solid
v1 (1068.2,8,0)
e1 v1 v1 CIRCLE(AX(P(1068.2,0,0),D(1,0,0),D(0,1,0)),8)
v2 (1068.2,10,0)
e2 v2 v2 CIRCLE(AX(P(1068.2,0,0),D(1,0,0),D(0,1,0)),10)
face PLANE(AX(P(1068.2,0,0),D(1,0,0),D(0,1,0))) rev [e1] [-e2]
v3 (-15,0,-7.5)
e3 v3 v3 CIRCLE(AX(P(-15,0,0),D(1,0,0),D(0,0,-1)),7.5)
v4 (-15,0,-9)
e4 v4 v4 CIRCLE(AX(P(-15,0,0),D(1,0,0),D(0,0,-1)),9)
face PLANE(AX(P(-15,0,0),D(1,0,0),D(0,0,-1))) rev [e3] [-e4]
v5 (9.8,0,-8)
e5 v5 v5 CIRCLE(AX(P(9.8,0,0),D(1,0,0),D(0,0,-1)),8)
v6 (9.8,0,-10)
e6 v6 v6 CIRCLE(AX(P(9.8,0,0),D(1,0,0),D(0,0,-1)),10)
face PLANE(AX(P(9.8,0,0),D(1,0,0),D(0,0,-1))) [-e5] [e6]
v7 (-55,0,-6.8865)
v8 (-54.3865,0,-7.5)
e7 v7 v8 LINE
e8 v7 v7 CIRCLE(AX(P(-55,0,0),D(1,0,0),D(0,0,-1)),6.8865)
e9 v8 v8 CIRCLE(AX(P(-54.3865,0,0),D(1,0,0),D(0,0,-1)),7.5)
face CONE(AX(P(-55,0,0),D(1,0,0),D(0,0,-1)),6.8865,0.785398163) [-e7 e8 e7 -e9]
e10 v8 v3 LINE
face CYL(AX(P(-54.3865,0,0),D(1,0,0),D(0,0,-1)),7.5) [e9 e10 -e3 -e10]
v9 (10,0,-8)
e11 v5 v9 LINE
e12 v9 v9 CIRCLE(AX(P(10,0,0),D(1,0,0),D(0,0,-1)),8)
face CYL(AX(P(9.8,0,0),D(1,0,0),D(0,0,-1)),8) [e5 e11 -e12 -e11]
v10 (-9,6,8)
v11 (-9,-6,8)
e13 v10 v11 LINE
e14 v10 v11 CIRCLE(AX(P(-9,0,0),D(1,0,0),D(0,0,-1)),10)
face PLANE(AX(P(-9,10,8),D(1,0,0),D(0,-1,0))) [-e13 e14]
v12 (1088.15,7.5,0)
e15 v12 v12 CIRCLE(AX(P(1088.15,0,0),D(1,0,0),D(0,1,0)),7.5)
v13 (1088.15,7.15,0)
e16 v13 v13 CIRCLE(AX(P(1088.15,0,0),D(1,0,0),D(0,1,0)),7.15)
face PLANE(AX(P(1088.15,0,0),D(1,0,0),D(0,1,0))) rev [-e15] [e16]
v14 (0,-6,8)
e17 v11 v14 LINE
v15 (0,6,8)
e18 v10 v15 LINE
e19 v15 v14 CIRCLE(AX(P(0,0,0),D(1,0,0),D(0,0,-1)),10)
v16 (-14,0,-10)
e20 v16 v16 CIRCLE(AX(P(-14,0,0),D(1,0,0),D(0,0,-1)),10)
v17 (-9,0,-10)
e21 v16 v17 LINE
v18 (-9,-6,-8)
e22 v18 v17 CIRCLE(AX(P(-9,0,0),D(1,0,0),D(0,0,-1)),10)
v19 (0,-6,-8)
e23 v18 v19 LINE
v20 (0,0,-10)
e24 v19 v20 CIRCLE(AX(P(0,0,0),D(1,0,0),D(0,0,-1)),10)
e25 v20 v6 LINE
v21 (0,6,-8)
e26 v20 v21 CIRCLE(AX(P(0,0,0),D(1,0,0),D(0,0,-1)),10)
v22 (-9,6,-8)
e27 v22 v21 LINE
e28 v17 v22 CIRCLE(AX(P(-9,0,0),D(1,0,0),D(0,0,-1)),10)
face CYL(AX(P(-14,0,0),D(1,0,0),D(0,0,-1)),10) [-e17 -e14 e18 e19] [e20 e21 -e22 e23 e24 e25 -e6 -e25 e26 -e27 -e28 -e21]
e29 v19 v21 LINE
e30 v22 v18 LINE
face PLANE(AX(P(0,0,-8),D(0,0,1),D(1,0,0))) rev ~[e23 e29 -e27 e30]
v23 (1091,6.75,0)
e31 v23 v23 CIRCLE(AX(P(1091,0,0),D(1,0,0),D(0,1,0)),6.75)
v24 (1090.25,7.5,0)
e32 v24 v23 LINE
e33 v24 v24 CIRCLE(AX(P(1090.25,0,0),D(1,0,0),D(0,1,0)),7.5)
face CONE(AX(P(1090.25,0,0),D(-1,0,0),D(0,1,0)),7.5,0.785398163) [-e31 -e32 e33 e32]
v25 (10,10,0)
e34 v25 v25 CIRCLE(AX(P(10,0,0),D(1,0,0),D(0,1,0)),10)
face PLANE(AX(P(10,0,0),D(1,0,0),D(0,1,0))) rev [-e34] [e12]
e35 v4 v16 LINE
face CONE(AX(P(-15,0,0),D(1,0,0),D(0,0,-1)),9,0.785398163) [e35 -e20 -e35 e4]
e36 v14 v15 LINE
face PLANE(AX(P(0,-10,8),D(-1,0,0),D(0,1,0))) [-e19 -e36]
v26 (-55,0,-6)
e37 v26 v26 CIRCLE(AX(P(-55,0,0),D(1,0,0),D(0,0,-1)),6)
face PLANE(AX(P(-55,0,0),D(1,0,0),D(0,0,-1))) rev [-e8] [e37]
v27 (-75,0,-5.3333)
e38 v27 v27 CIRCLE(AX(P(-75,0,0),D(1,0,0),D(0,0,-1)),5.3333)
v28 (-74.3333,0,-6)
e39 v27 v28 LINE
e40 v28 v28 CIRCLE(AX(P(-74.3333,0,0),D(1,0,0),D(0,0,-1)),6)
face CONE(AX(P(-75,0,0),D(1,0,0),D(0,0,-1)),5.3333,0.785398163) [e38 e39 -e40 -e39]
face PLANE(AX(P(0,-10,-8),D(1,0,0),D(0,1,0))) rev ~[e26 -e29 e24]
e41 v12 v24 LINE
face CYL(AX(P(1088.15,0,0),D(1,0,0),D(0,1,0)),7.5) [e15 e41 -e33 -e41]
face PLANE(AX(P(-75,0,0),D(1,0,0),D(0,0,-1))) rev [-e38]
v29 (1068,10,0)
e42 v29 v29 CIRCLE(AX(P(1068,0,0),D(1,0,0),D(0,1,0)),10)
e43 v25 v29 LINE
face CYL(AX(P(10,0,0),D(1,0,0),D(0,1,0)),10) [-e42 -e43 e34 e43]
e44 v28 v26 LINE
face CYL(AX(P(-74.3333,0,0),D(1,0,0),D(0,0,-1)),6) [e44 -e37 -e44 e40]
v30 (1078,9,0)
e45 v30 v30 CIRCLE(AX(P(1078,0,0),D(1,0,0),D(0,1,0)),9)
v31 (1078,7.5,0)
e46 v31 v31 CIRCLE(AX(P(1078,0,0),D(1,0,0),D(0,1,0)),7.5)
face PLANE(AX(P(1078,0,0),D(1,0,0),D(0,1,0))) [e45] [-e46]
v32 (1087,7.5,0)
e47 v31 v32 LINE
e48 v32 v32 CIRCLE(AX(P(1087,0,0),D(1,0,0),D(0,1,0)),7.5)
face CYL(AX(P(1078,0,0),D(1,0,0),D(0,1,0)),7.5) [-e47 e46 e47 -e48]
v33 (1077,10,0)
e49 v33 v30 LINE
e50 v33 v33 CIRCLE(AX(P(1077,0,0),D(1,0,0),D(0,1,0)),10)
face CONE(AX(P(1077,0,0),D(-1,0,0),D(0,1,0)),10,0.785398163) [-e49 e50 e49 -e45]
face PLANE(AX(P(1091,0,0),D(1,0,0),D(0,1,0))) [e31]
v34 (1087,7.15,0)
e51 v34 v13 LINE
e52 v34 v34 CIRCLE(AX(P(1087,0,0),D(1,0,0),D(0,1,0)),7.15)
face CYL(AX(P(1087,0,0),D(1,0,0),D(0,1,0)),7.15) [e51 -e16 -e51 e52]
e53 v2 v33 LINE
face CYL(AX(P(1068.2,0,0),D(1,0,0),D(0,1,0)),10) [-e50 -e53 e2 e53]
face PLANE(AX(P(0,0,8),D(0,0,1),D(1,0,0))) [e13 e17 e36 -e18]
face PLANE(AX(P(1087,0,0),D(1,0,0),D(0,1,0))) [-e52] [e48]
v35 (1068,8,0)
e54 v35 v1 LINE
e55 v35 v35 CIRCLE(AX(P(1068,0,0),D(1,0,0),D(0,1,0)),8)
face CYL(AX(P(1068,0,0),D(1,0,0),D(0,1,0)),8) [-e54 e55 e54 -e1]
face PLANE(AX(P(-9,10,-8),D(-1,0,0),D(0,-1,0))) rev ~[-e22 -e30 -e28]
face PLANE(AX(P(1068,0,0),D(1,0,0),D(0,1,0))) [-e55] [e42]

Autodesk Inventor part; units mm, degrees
sketch "Sketch_1" plane through (0, 0, 0) normal (0, 0, 1) x (1, 0, 0)
  line L0 (1068, 0) -> (10, 0)
  line L1 (10, 0) -> (10, 10)
  line L2 (10, 10) -> (1068, 10)
  line L3 (1068, 10) -> (1068, 0)
  line L4 (1068, 0) -> (10, 0)
revolve "Revolution1" add sketch "Sketch_1" angle 360 about axis through (1068, 0, 0) along (1, 0, 0)
thread "Thread1" size "M20x2.5" class "6g" standard "ISO Metric profile" full length
sketch "Sketch_10" plane through (0, 0, 0) normal (0, 1, 0) x (-1, 0, 0)
  line L0 (-10, 0) -> (75, 0)
  line L1 (75, 0) -> (75, -5.3333)
  line L2 (75, -5.3333) -> (74.3333, -6)
  line L3 (74.3333, -6) -> (55, -6)
  line L4 (55, -6) -> (55, -6.8865)
  line L5 (55, -6.8865) -> (54.3865, -7.5)
  line L6 (54.3865, -7.5) -> (15, -7.5)
  line L7 (15, -7.5) -> (15, -9)
  line L8 (15, -9) -> (14, -10)
  line L9 (14, -10) -> (-9.8, -10)
  line L10 (-9.8, -10) -> (-9.8, -8)
  line L11 (-9.8, -8) -> (-10, -8)
  line L12 (-10, -8) -> (-10, 0)
  line L13 (-10, 0) -> (75, 0)
revolve "Revolution2" add sketch "Sketch_10" angle 360 about axis through (10, 0, 0) along (1, 0, 0)
thread "Thread2" size "M15x1" class "6g" standard "ISO Metric profile" length 11.3865
sketch "Sketch_11" plane through (0, 0, 8) normal (0, 0, 1) x (1, 0, 0)
  line L0 (-9, -10) -> (0, -10)
  line L1 (0, -10) -> (0, 10)
  line L2 (0, 10) -> (-9, 10)
  line L3 (-9, 10) -> (-9, -10)
extrude "Extrusion1" cut sketch "Sketch_11" along normal blind 4
sketch "Sketch_12" plane through (0, 0, -8) normal (0, 0, 1) x (1, 0, 0)
  line L0 (-9, -10) -> (0, -10)
  line L1 (0, -10) -> (0, 10)
  line L2 (0, 10) -> (-9, 10)
  line L3 (-9, 10) -> (-9, -10)
extrude "Extrusion2" cut sketch "Sketch_12" against normal blind 4
sketch "Sketch_16" plane through (0, 0, 0) normal (0, 0, 1) x (1, 0, 0)
  line L0 (1091, 0) -> (1068, 0)
  line L1 (1068, 0) -> (1068, 8)
  line L2 (1068, 8) -> (1068.2, 8)
  line L3 (1068.2, 8) -> (1068.2, 10)
  line L4 (1068.2, 10) -> (1077, 10)
  line L5 (1077, 10) -> (1078, 9)
  line L6 (1078, 9) -> (1078, 7.5)
  line L7 (1078, 7.5) -> (1087, 7.5)
  line L8 (1087, 7.5) -> (1087, 7.15)
  line L9 (1087, 7.15) -> (1088.15, 7.15)
  line L10 (1088.15, 7.15) -> (1088.15, 7.5)
  line L11 (1088.15, 7.5) -> (1090.25, 7.5)
  line L12 (1090.25, 7.5) -> (1091, 6.75)
  line L13 (1091, 6.75) -> (1091, 0)
  line L14 (1091, 0) -> (1068, 0)
revolve "Revolution3" add sketch "Sketch_16" angle 360 about axis through (1091, 0, 0) along (1, 0, 0)
ref_plane "FSS_XY" through (-15, 0, 0) normal (1, 0, 0) x (0, 0, -1)
ref_plane "FSS_YZ" through (-15, 0, 0) normal (0, 0, -1) x (0, 1, 0)
ref_plane "FSS_ZX" through (-15, 0, 0) normal (0, 1, 0) x (1, 0, 0)
ref_plane "SSS_XY" through (1078, 0, 0) normal (1, 0, 0) x (0, 0, -1)
ref_plane "SSS_YZ" through (1078, 0, 0) normal (0, 0, -1) x (0, 1, 0)
ref_plane "SSS_ZX" through (1078, 0, 0) normal (0, 1, 0) x (1, 0, 0)
ref_plane "bnt_s_1_XY" through (0, 0, 0) normal (-1, 0, 0) x (0, 0, -1)
ref_plane "bnt_s_1_YZ" through (0, 0, 0) normal (0, 0, -1) x (0, -1, 0)
ref_plane "bnt_s_1_ZX" through (0, 0, 0) normal (0, -1, 0) x (-1, 0, 0)
properties part number "BNT 2010-2.61000-J1K Shaft" material "Steel"
